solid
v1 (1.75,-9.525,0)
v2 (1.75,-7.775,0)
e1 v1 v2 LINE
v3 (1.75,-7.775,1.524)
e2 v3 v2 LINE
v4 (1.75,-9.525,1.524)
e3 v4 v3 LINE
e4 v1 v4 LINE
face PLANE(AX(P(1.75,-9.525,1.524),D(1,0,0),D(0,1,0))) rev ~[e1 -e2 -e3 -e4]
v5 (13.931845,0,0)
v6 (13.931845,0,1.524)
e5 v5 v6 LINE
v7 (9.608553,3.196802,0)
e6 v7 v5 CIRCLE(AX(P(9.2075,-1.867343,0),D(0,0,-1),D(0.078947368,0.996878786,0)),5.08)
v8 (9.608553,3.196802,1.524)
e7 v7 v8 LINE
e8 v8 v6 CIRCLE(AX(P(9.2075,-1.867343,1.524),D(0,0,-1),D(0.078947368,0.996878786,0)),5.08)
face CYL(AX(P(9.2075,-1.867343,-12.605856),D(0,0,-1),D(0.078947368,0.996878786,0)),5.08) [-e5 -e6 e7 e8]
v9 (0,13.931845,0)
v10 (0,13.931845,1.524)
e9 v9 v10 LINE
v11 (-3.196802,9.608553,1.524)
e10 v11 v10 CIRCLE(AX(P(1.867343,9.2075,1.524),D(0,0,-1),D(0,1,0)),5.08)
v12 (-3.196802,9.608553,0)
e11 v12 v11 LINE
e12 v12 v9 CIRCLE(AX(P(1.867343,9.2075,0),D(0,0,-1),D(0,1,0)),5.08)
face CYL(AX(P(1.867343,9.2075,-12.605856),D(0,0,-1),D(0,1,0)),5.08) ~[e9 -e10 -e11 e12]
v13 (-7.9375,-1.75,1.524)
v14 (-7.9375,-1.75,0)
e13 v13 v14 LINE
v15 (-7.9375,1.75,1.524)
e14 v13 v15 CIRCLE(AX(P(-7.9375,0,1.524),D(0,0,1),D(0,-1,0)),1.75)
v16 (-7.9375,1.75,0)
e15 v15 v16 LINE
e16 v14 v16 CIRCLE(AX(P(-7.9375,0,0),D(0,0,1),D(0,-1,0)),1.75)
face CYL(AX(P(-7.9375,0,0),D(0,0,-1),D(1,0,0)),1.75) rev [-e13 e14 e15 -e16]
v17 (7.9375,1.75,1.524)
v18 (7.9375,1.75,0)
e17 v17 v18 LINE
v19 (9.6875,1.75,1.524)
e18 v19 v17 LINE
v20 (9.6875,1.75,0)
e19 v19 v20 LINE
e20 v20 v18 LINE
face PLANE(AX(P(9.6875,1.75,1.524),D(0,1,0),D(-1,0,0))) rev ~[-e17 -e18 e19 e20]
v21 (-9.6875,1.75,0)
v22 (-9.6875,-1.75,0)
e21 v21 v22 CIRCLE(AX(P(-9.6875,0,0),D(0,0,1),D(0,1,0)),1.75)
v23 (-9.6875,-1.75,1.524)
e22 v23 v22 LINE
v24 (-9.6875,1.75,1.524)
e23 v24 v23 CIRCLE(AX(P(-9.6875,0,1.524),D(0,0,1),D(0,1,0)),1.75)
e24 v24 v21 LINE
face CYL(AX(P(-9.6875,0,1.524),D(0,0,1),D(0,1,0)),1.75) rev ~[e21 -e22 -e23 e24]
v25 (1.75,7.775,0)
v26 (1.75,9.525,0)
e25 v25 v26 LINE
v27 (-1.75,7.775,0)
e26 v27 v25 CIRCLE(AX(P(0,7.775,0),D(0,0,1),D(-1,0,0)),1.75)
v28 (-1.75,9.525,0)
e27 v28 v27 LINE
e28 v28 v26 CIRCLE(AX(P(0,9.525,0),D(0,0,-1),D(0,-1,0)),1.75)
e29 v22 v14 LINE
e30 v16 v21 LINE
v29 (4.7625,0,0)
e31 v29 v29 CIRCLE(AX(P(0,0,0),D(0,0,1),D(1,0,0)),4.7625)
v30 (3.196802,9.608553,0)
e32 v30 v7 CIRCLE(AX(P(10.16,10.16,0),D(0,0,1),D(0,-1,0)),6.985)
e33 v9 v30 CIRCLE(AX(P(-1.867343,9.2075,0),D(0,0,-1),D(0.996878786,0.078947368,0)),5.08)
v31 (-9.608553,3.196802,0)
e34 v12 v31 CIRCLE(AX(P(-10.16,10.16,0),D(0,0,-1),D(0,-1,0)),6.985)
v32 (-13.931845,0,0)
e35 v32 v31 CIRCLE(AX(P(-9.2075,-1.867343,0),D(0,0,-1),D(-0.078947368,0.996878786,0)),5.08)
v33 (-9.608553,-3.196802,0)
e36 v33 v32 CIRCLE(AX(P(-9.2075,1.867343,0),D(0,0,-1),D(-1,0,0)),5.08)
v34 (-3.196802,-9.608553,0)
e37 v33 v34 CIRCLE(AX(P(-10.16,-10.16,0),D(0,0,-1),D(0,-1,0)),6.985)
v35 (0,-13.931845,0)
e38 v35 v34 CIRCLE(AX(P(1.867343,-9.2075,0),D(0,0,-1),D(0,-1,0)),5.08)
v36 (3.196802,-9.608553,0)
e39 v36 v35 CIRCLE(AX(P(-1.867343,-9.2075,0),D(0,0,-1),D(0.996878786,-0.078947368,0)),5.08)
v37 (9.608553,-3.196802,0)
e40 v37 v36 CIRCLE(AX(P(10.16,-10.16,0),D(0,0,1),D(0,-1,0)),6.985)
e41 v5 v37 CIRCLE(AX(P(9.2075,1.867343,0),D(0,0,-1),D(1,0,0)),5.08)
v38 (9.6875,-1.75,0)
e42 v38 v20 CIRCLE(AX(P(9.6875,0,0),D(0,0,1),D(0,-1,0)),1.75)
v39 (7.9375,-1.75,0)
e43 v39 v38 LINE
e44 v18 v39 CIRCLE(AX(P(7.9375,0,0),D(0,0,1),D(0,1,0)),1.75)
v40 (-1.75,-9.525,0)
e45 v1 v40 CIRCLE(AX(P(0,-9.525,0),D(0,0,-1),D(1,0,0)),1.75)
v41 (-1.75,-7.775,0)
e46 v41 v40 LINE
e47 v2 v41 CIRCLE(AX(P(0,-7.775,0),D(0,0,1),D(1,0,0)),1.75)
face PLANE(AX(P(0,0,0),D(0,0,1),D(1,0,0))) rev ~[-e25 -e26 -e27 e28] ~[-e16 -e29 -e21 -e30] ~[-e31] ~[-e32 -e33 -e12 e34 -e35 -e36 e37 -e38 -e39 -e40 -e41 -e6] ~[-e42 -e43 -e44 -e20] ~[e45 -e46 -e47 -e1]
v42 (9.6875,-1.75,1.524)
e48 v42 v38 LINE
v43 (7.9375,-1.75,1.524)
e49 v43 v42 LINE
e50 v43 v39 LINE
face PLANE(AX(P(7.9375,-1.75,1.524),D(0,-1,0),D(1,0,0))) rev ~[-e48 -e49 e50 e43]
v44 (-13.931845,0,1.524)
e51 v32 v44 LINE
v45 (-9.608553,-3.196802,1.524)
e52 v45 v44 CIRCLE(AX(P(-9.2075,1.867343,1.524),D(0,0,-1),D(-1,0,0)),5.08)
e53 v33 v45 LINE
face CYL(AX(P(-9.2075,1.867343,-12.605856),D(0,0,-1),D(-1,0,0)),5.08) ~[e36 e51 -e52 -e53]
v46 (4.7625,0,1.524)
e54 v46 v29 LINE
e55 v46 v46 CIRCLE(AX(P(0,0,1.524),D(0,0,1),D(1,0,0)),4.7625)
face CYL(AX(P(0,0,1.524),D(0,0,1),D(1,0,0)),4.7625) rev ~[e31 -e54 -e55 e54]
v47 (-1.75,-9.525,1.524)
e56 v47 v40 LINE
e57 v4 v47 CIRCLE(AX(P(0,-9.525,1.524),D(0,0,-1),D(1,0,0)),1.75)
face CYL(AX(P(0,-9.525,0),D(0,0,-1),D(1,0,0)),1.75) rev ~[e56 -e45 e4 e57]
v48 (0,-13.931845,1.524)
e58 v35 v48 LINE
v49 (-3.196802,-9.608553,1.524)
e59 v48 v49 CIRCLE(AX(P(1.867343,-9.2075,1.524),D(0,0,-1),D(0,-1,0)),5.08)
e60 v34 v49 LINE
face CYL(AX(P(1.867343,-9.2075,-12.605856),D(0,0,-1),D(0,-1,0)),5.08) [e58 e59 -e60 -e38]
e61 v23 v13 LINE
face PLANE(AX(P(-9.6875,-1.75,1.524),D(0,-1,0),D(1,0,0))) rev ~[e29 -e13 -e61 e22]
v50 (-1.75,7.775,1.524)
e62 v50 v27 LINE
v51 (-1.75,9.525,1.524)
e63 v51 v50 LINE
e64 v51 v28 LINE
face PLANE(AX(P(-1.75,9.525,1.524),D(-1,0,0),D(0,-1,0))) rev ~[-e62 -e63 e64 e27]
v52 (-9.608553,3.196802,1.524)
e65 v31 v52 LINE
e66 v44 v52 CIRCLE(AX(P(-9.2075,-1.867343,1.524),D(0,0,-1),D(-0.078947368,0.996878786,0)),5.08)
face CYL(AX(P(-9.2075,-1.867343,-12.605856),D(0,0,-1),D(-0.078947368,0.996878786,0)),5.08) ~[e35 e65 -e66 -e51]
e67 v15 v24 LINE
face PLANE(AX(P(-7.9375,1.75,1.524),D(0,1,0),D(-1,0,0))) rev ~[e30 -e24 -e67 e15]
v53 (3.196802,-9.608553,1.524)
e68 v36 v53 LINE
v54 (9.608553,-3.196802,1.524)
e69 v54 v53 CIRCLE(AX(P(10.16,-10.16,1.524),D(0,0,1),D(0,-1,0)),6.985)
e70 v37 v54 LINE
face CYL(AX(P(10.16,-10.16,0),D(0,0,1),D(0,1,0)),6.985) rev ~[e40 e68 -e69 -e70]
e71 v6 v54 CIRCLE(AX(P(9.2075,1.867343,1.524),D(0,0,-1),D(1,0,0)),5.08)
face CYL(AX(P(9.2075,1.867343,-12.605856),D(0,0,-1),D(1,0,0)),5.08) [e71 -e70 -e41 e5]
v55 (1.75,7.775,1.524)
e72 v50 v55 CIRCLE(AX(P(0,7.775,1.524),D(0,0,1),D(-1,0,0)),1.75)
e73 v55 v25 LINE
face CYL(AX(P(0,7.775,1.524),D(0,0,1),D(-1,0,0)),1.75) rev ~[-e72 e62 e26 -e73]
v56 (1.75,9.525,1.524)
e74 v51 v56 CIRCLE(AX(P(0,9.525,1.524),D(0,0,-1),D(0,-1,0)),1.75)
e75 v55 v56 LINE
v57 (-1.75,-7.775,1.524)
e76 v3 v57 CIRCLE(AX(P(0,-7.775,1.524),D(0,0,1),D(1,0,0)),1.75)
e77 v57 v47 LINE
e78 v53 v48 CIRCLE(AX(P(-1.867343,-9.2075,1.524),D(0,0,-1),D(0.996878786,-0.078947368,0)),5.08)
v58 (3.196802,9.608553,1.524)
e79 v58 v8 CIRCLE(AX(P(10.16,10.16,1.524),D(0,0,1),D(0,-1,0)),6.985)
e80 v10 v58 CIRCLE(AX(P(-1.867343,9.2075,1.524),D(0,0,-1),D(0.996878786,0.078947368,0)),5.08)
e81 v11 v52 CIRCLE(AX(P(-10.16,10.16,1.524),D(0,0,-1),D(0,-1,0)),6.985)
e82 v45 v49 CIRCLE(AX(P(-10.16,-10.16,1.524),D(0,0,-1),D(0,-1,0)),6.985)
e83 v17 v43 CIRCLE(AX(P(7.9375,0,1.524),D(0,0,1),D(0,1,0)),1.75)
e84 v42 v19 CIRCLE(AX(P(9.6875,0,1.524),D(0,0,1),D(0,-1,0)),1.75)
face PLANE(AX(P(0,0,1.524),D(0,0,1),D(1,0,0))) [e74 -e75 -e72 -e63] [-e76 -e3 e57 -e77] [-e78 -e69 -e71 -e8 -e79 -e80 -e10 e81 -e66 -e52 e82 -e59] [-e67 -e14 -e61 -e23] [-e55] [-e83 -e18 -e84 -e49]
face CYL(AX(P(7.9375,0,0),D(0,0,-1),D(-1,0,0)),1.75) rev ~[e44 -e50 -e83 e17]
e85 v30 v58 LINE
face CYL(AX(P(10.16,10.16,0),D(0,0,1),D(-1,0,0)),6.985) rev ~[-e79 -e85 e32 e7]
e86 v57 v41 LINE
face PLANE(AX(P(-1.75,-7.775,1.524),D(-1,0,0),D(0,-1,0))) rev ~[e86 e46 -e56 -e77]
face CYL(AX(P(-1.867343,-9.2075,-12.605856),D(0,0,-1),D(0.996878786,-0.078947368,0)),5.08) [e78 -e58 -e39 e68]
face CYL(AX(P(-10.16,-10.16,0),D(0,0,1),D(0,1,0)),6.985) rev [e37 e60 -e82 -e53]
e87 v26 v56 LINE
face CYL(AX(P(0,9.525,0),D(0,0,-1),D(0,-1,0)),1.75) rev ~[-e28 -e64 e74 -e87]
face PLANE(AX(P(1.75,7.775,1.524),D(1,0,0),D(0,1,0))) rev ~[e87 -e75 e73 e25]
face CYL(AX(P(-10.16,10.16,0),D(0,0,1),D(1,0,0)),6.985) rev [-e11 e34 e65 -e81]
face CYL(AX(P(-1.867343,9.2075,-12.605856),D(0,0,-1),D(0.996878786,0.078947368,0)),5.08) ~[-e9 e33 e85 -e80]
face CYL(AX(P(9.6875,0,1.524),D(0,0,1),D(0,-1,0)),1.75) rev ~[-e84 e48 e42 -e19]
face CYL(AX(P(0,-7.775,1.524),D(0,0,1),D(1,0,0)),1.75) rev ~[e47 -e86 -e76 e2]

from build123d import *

# Parameters (mm, degrees)
F0_R        = 1.75
F1_DEPTH    = 1.524
F2_R        = 6.985
F3_T1_DEPTH = 26.7357127365
F4_R        = 4.7625
F5_DEPTH    = 25.4


# Not quite as in the source:
# - a fillet or chamfer that OpenCascade refuses, or shapes differently, is made with other operations: its cross-section is extruded or revolved along the edge and cut away or added


with BuildPart() as f1:
    # F0 (on Top) → F1 (new body)
    with BuildSketch(Plane.XY):
        Polygon((3.175, 3.175), (3.175, 14.2875), (-3.175, 14.2875), (-3.175, 3.175), (-14.2875, 3.175), (-14.2875, -3.175), (-3.175, -3.175), (-3.175, -14.2875), (3.175, -14.2875), (3.175, -3.175), (14.2875, -3.175), (14.2875, 3.175), align=None)
        with BuildLine():
            ThreePointArc((1.75, -9.525), (-1.2374368671, -10.7624368671), (0, -7.775))
            ThreePointArc((0, -7.775), (1.2374368671, -8.2875631329), (1.75, -9.525))
        make_face(mode=Mode.SUBTRACT)
        with Locations((-7.9375, 0)):
            Circle(F0_R, mode=Mode.SUBTRACT)
        with BuildLine():
            ThreePointArc((9.6875, 0), (7.9375, -1.75), (6.1875, 0))
            ThreePointArc((6.1875, 0), (7.9375, 1.75), (9.6875, 0))
        make_face(mode=Mode.SUBTRACT)
        with BuildLine():
            ThreePointArc((0, 7.775), (-1.2374368671, 10.7624368671), (1.75, 9.525))
            ThreePointArc((1.75, 9.525), (1.2374368671, 8.2875631329), (0, 7.775))
        make_face(mode=Mode.SUBTRACT)
    extrude(amount=F1_DEPTH)

    # F2
    f2_edges = [f1.edges().sort_by_distance(p)[0] for p in [
        (3.175, -3.175, 0.762),
        (-3.175, 3.175, 0.762),
        (3.175, 3.175, 0.762),
        (-3.175, -3.175, 0.762),
    ]]
    fillet(f2_edges, radius=F2_R)

    # F3: fillet of radius 5.08 on 8 edges, made by hand

    # F3_s2 → F3_t1 (cut)
    with BuildSketch(Plane.XY.offset(-12.6058563682)):
        with BuildLine():
            ThreePointArc((3.1968016831, 9.6085526316), (1.5800515868, 12.9387027128), (-1.8673425473, 14.2875))
            Line((-1.8673425473, 14.2875), (-1.8673425473, 14.7955))
            Line((-1.8673425473, 14.7955), (3.175, 14.7955))
            Line((3.175, 14.7955), (3.683, 14.2875))
            ThreePointArc((3.683, 14.2875), (3.683, 10.16), (3.7032161062, 9.6486578947))
            Line((3.7032161062, 9.6486578947), (3.1968016831, 9.6085526316))
        make_face()
        with BuildLine():
            ThreePointArc((1.8673425473, 14.2875), (-1.5800515868, 12.9387027128), (-3.1968016831, 9.6085526316))
            Line((-3.1968016831, 9.6085526316), (-3.7032161062, 9.6486578947))
            ThreePointArc((-3.7032161062, 9.6486578947), (-3.683, 10.16), (-3.683, 14.2875))
            Line((-3.683, 14.2875), (-3.175, 14.7955))
            Line((-3.175, 14.7955), (1.8673425473, 14.7955))
            Line((1.8673425473, 14.7955), (1.8673425473, 14.2875))
        make_face()
        with BuildLine():
            ThreePointArc((-14.2875, 1.8673425473), (-12.9387027128, -1.5800515868), (-9.6085526316, -3.1968016831))
            Line((-9.6085526316, -3.1968016831), (-9.6486578947, -3.7032161062))
            ThreePointArc((-9.6486578947, -3.7032161062), (-10.16, -3.683), (-14.2875, -3.683))
            Line((-14.2875, -3.683), (-14.7955, -3.175))
            Line((-14.7955, -3.175), (-14.7955, 1.8673425473))
            Line((-14.7955, 1.8673425473), (-14.2875, 1.8673425473))
        make_face()
        with BuildLine():
            ThreePointArc((-9.6085526316, 3.1968016831), (-12.9387027128, 1.5800515868), (-14.2875, -1.8673425473))
            Line((-14.2875, -1.8673425473), (-14.7955, -1.8673425473))
            Line((-14.7955, -1.8673425473), (-14.7955, 3.175))
            Line((-14.7955, 3.175), (-14.2875, 3.683))
            ThreePointArc((-14.2875, 3.683), (-10.16, 3.683), (-9.6486578947, 3.7032161062))
            Line((-9.6486578947, 3.7032161062), (-9.6085526316, 3.1968016831))
        make_face()
        with BuildLine():
            ThreePointArc((1.8673425473, -14.2875), (-1.5800515868, -12.9387027128), (-3.1968016831, -9.6085526316))
            Line((-3.1968016831, -9.6085526316), (-3.7032161062, -9.6486578947))
            ThreePointArc((-3.7032161062, -9.6486578947), (-3.683, -10.16), (-3.683, -14.2875))
            Line((-3.683, -14.2875), (-3.175, -14.7955))
            Line((-3.175, -14.7955), (1.8673425473, -14.7955))
            Line((1.8673425473, -14.7955), (1.8673425473, -14.2875))
        make_face()
        with BuildLine():
            ThreePointArc((3.1968016831, -9.6085526316), (1.5800515868, -12.9387027128), (-1.8673425473, -14.2875))
            Line((-1.8673425473, -14.2875), (-1.8673425473, -14.7955))
            Line((-1.8673425473, -14.7955), (3.175, -14.7955))
            Line((3.175, -14.7955), (3.683, -14.2875))
            ThreePointArc((3.683, -14.2875), (3.683, -10.16), (3.7032161062, -9.6486578947))
            Line((3.7032161062, -9.6486578947), (3.1968016831, -9.6085526316))
        make_face()
        with BuildLine():
            ThreePointArc((14.2875, 1.8673425473), (12.9387027128, -1.5800515868), (9.6085526316, -3.1968016831))
            Line((9.6085526316, -3.1968016831), (9.6486578947, -3.7032161062))
            ThreePointArc((9.6486578947, -3.7032161062), (10.16, -3.683), (14.2875, -3.683))
            Line((14.2875, -3.683), (14.7955, -3.175))
            Line((14.7955, -3.175), (14.7955, 1.8673425473))
            Line((14.7955, 1.8673425473), (14.2875, 1.8673425473))
        make_face()
        with BuildLine():
            ThreePointArc((9.6085526316, 3.1968016831), (12.9387027128, 1.5800515868), (14.2875, -1.8673425473))
            Line((14.2875, -1.8673425473), (14.7955, -1.8673425473))
            Line((14.7955, -1.8673425473), (14.7955, 3.175))
            Line((14.7955, 3.175), (14.2875, 3.683))
            ThreePointArc((14.2875, 3.683), (10.16, 3.683), (9.6486578947, 3.7032161062))
            Line((9.6486578947, 3.7032161062), (9.6085526316, 3.1968016831))
        make_face()
    extrude(amount=F3_T1_DEPTH, mode=Mode.SUBTRACT)

    # F4 (on face) → F5 (cut)
    with BuildSketch(Plane.XY.offset(1.524)):
        Circle(F4_R)
        with BuildLine():
            ThreePointArc((1.75, 9.525), (0, 11.275), (-1.75, 9.525))
            Line((-1.75, 9.525), (-1.75, 7.775))
            ThreePointArc((-1.75, 7.775), (0, 6.025), (1.75, 7.775))
            Line((1.75, 7.775), (1.75, 9.525))
        make_face()
        with BuildLine():
            ThreePointArc((-1.75, -9.525), (0, -11.275), (1.75, -9.525))
            Line((1.75, -9.525), (1.75, -7.775))
            ThreePointArc((1.75, -7.775), (0, -6.025), (-1.75, -7.775))
            Line((-1.75, -7.775), (-1.75, -9.525))
        make_face()
        with BuildLine():
            ThreePointArc((7.9375, 1.75), (6.1875, 0), (7.9375, -1.75))
            Line((7.9375, -1.75), (9.6875, -1.75))
            ThreePointArc((9.6875, -1.75), (11.4375, 0), (9.6875, 1.75))
            Line((9.6875, 1.75), (7.9375, 1.75))
        make_face()
        with BuildLine():
            ThreePointArc((-7.9375, -1.75), (-6.1875, 0), (-7.9375, 1.75))
            Line((-7.9375, 1.75), (-9.6875, 1.75))
            ThreePointArc((-9.6875, 1.75), (-11.4375, 0), (-9.6875, -1.75))
            Line((-9.6875, -1.75), (-7.9375, -1.75))
        make_face()
    extrude(amount=-F5_DEPTH, mode=Mode.SUBTRACT)


solid = f1.part
